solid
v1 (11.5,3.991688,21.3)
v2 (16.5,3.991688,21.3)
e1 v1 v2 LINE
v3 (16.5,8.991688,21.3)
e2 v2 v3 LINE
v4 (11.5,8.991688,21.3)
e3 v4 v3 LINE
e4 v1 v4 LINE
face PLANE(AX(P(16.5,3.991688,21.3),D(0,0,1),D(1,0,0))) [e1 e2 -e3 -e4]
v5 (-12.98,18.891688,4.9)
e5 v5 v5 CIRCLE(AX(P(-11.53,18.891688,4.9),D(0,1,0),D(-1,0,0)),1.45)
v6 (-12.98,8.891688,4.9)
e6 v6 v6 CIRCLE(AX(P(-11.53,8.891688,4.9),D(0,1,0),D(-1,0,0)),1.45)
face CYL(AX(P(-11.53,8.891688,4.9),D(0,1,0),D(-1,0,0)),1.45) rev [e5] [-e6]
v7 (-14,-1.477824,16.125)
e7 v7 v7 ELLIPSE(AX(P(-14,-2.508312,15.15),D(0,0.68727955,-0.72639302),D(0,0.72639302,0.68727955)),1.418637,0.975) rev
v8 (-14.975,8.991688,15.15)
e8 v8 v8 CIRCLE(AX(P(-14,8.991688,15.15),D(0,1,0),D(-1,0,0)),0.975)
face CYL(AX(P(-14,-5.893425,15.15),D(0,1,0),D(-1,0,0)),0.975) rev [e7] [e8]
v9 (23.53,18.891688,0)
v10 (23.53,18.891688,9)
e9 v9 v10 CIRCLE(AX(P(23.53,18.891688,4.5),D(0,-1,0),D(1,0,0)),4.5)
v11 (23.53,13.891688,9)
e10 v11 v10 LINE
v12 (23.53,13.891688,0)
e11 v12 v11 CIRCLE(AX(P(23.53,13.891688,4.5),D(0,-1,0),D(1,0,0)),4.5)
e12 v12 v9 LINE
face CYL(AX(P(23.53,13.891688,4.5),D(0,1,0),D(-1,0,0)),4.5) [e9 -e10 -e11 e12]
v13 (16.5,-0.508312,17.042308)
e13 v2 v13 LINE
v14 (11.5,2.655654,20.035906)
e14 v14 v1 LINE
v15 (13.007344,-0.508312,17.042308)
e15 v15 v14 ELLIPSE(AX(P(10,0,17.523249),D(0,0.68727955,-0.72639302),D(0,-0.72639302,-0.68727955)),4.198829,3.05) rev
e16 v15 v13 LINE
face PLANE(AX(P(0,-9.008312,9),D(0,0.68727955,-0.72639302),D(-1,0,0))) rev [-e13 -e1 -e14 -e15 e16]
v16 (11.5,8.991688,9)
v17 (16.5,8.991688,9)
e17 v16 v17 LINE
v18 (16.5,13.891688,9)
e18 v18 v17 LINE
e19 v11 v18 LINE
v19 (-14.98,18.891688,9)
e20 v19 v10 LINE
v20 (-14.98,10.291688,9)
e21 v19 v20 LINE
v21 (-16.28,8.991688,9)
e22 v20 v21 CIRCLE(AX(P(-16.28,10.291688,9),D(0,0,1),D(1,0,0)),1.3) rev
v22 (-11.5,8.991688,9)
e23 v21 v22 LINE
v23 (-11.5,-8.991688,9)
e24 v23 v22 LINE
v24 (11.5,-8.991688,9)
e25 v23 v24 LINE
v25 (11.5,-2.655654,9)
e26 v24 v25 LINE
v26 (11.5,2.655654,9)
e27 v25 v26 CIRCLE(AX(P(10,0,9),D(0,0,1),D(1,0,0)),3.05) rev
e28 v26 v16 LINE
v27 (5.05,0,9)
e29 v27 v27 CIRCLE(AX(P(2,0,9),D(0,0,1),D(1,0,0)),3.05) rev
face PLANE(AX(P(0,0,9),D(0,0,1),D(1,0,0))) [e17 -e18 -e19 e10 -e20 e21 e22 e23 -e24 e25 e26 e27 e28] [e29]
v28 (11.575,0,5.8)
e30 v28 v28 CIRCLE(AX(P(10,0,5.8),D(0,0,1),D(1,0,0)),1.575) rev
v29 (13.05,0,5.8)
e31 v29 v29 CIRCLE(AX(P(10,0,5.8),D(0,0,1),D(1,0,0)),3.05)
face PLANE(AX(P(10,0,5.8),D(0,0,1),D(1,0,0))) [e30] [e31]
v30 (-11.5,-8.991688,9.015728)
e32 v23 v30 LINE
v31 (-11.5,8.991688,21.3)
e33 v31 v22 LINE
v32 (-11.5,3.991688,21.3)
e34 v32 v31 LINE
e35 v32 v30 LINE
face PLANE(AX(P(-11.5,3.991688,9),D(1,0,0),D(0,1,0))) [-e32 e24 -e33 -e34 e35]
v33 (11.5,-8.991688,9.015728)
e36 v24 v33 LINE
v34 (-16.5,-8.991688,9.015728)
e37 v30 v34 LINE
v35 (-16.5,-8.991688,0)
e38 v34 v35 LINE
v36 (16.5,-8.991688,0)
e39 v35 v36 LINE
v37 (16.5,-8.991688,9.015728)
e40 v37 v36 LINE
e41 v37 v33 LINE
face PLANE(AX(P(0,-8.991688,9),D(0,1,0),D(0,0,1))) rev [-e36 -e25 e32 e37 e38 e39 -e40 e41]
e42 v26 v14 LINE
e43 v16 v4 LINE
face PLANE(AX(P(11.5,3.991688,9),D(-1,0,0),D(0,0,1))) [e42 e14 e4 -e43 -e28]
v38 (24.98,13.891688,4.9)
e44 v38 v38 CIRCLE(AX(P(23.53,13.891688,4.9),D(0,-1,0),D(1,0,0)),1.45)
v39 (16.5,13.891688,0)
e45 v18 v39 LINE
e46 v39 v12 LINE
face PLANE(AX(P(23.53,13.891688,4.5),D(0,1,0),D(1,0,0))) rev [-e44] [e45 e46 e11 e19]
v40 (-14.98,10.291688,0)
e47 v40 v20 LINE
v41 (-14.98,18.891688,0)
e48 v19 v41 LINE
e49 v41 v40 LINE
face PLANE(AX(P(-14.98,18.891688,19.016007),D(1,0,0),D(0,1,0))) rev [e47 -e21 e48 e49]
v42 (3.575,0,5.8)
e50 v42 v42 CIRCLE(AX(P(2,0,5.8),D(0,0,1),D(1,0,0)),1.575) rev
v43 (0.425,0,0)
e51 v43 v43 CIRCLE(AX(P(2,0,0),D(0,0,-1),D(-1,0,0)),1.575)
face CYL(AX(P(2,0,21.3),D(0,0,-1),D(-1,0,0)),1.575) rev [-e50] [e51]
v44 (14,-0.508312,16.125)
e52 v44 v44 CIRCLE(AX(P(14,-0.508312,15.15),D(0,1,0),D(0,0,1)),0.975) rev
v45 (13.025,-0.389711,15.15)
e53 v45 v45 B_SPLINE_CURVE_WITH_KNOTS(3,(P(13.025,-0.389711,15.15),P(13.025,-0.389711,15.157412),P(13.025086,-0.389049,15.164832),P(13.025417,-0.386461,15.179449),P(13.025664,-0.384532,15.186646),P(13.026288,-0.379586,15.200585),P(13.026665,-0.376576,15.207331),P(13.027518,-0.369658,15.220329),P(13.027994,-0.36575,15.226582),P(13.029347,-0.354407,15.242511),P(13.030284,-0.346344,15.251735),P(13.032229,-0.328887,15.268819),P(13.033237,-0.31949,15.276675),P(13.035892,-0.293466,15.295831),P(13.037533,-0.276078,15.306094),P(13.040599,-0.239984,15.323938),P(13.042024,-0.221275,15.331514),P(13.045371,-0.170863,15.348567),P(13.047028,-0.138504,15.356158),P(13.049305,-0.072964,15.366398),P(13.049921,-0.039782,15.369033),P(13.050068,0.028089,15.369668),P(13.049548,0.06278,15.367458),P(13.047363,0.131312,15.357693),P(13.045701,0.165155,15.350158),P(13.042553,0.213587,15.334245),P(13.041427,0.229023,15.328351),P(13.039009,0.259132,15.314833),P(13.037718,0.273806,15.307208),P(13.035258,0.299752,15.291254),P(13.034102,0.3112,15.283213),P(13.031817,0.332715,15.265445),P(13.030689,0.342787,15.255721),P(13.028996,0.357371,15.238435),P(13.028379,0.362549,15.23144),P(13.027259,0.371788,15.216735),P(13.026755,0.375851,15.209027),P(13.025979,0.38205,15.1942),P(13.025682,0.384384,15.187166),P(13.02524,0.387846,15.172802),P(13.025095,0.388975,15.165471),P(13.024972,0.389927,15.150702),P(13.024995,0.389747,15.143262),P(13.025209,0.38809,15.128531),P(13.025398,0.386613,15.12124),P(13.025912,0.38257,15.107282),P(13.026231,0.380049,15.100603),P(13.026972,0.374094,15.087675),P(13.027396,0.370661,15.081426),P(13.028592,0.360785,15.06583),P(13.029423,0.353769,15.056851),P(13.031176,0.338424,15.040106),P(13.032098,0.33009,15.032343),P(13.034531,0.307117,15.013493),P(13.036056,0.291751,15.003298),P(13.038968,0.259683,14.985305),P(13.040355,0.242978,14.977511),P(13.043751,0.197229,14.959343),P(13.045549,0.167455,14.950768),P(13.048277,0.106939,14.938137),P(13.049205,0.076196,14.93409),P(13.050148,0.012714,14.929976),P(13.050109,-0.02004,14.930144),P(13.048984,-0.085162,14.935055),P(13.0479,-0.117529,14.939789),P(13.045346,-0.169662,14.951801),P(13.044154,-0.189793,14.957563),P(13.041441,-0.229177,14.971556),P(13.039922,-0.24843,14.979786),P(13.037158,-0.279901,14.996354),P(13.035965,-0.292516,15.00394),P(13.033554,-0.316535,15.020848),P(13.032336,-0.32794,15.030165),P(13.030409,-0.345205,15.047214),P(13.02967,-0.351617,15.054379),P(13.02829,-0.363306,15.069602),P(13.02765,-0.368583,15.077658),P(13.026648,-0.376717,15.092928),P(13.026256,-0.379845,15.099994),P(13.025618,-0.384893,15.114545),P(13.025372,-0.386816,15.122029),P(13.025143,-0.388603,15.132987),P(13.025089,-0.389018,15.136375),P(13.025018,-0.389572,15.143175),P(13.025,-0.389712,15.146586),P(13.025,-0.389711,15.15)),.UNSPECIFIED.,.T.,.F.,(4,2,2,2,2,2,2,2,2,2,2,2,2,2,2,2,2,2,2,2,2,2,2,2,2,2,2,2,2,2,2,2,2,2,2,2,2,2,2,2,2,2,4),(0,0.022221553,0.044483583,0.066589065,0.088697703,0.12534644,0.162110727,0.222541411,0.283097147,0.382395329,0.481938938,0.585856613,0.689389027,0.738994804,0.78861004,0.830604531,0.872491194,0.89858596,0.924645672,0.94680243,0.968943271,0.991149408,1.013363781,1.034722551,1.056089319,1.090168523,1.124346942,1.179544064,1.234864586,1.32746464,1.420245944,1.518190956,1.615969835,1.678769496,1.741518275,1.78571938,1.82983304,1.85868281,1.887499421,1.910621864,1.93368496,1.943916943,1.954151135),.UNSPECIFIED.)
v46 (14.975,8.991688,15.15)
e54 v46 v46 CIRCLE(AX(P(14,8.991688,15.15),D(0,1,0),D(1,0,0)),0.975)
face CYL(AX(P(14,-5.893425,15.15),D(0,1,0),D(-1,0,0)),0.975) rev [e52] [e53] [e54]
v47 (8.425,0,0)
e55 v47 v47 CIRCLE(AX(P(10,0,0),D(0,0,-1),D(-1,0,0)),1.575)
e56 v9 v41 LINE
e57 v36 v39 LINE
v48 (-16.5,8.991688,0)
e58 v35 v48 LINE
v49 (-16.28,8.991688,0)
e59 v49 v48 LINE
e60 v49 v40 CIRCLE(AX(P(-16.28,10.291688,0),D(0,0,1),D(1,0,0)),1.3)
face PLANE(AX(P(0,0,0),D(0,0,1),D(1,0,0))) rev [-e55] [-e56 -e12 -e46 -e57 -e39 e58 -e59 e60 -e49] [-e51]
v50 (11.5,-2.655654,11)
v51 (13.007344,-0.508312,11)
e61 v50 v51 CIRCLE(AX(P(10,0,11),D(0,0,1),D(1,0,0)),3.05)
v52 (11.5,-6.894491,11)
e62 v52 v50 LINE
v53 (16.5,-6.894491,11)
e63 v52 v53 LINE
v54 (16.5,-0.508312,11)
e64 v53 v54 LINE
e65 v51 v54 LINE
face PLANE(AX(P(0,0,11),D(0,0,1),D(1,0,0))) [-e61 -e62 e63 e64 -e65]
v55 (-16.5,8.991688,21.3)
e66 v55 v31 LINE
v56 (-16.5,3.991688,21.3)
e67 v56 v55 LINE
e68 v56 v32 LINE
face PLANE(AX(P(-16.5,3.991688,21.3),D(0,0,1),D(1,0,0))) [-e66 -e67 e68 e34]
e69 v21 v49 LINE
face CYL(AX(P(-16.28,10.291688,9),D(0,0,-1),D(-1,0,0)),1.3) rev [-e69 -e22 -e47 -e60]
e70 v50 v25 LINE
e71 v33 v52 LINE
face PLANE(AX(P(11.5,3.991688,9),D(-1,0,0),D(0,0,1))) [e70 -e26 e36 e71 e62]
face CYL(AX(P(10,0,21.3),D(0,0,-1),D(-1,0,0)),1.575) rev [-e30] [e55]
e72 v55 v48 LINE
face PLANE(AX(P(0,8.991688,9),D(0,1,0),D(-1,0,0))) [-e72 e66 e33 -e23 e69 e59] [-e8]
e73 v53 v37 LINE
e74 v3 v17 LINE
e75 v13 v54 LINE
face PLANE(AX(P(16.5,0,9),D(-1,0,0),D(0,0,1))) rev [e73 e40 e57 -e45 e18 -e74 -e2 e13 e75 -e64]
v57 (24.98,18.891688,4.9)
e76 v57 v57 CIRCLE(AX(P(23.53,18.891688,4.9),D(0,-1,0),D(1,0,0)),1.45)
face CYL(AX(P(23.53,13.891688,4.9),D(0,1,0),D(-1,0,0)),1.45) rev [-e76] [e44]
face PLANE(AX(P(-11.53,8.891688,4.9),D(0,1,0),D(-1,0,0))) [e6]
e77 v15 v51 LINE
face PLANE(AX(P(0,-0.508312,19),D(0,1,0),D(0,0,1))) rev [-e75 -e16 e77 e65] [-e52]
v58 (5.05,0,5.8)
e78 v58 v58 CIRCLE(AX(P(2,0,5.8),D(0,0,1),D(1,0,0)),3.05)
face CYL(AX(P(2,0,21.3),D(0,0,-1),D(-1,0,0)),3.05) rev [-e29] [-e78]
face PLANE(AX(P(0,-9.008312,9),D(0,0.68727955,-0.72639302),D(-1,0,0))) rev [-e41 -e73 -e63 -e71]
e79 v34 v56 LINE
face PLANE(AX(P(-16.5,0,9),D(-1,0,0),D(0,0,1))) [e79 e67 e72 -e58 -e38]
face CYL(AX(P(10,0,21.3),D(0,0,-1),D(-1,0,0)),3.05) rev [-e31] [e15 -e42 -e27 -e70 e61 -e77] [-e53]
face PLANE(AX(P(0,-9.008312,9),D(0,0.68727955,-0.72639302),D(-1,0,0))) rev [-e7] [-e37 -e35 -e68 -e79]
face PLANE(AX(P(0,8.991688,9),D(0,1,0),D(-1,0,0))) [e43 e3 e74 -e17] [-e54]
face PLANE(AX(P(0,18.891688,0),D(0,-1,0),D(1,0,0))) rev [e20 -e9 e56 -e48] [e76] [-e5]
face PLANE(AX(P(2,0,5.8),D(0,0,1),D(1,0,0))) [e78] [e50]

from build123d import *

# Parameters (mm, degrees)
SKETCH1_W               = 33
SKETCH1_H               = 17.983376384
BOSS_EXTRUDE1_DEPTH     = 9
SKETCH4_W               = 5
SKETCH4_H               = 12.3
BOSS_EXTRUDE2_DEPTH     = 5
CHAMFER1_SIZE           = 13
CHAMFER1_SIZE_2         = 12.3
SKETCH2_R               = 1.575
CUT_EXTRUDE1_DEPTH      = 29.404057044
CUT_EXTRUDE2_DEPTH      = 23.458638795
CUT_EXTRUDE2_DEPTH_BACK = 3.2
SKETCH3_R               = 3.05
CUT_EXTRUDE3_REACH      = 34.394
SKETCH5_R               = 0.975
SKETCH6_W               = 33
SKETCH6_H               = 9
BOSS_EXTRUDE3_DEPTH     = 9.9
CUT_EXTRUDE4_START      = 2
CUT_EXTRUDE4_DEPTH      = 8
SKETCH8_R               = 1.45
CUT_EXTRUDE5_DEPTH      = 10
SKETCH9_R               = 1.45
BOSS_EXTRUDE4_DEPTH     = 5
SKETCH10_W              = 1.52
SKETCH10_H              = 9.9
CUT_EXTRUDE6_DEPTH      = 9
FILLET1_R               = 1.3


with BuildPart() as part:
    # Sketch1 → Boss-Extrude1 (new body)
    with BuildSketch(Plane.XY):
        Rectangle(SKETCH1_W, SKETCH1_H)
    extrude(amount=BOSS_EXTRUDE1_DEPTH)

    # Sketch4 → Boss-Extrude2 (add)
    with BuildSketch(Plane(origin=(0, 8.991688192, 0), x_dir=(1, 0, 0), z_dir=(0, 1, 0))):
        with Locations((-14, -15.15)):
            Rectangle(SKETCH4_W, SKETCH4_H)
        with Locations((14, -15.15)):
            Rectangle(SKETCH4_W, SKETCH4_H)
    extrude(amount=-BOSS_EXTRUDE2_DEPTH)

    # Chamfer1
    # the kernel refuses this chamfer: 13, 12.3 mm, written as the material it adds along each edge
    with BuildSketch(Plane(origin=(-16.5, 3.991688192, 9), x_dir=(0, -0.9996433463604261, -0.02670543160724426), z_dir=(1, 0, 0))) as chamfer1_piece_1_section:
        Polygon((CHAMFER1_SIZE * 0.99964334636, -CHAMFER1_SIZE * 0.0267054316072), (-CHAMFER1_SIZE_2 * 0.0267054316072, -CHAMFER1_SIZE_2 * 0.99964334636), (0, 0), align=None)
    chamfer1_piece_1 = extrude(amount=5, mode=Mode.PRIVATE)
    chamfer1_piece_1 = split(chamfer1_piece_1, bisect_by=Plane(origin=(-14, -8.991688192, 13.04185716), z_dir=(0, 1, 0)), keep=Keep.TOP, mode=Mode.PRIVATE)
    chamfer1_piece_1 = split(chamfer1_piece_1, bisect_by=Plane(origin=(-14, -0.292838715, 21.3), z_dir=(0, 0, -1)), keep=Keep.TOP, mode=Mode.PRIVATE)
    add(chamfer1_piece_1)
    with BuildSketch(Plane(origin=(-16.5, 3.991688192, 9), x_dir=(0, -0.9996433463604261, -0.02670543160724426), z_dir=(1, 0, 0))) as chamfer1_piece_2_section:
        Polygon((CHAMFER1_SIZE * 0.99964334636, -CHAMFER1_SIZE * 0.0267054316072), (-CHAMFER1_SIZE_2 * 0.0267054316072, -CHAMFER1_SIZE_2 * 0.99964334636), (0, 0), align=None)
    chamfer1_piece_2 = extrude(amount=38.456243217, mode=Mode.PRIVATE)
    chamfer1_piece_2 = split(chamfer1_piece_2, bisect_by=Plane(origin=(14, -8.991688192, 13.04185716), z_dir=(0, 1, 0)), keep=Keep.TOP, mode=Mode.PRIVATE)
    chamfer1_piece_2 = split(chamfer1_piece_2, bisect_by=Plane(origin=(16.5, -0.292838715, 13.04185716), z_dir=(-1, 0, 0)), keep=Keep.TOP, mode=Mode.PRIVATE)
    chamfer1_piece_2 = split(chamfer1_piece_2, bisect_by=Plane(origin=(11.5, -0.292838715, 13.04185716), z_dir=(1, 0, 0)), keep=Keep.TOP, mode=Mode.PRIVATE)
    chamfer1_piece_2 = split(chamfer1_piece_2, bisect_by=Plane(origin=(14, -0.292838715, 21.3), z_dir=(0, 0, -1)), keep=Keep.TOP, mode=Mode.PRIVATE)
    add(chamfer1_piece_2)
    with BuildSketch(Plane(origin=(16.5, 3.991688192, 9), x_dir=(0, -0.9996433463604261, -0.02670543160724426), z_dir=(-1, 0, 0))) as chamfer1_piece_3_section:
        Polygon((CHAMFER1_SIZE * 0.99964334636, CHAMFER1_SIZE * 0.0267054316072), (-CHAMFER1_SIZE_2 * 0.0267054316072, CHAMFER1_SIZE_2 * 0.99964334636), (0, 0), align=None)
    chamfer1_piece_3 = extrude(amount=5, mode=Mode.PRIVATE)
    chamfer1_piece_3 = split(chamfer1_piece_3, bisect_by=Plane(origin=(14, -8.991688192, 13.04185716), z_dir=(0, 1, 0)), keep=Keep.TOP, mode=Mode.PRIVATE)
    chamfer1_piece_3 = split(chamfer1_piece_3, bisect_by=Plane(origin=(14, -0.292838715, 21.3), z_dir=(0, 0, -1)), keep=Keep.TOP, mode=Mode.PRIVATE)
    add(chamfer1_piece_3)
    with BuildSketch(Plane(origin=(16.5, 3.991688192, 9), x_dir=(0, -0.9996433463604261, -0.02670543160724426), z_dir=(-1, 0, 0))) as chamfer1_piece_4_section:
        Polygon((CHAMFER1_SIZE * 0.99964334636, CHAMFER1_SIZE * 0.0267054316072), (-CHAMFER1_SIZE_2 * 0.0267054316072, CHAMFER1_SIZE_2 * 0.99964334636), (0, 0), align=None)
    chamfer1_piece_4 = extrude(amount=38.456243217, mode=Mode.PRIVATE)
    chamfer1_piece_4 = split(chamfer1_piece_4, bisect_by=Plane(origin=(-14, -8.991688192, 13.04185716), z_dir=(0, 1, 0)), keep=Keep.TOP, mode=Mode.PRIVATE)
    chamfer1_piece_4 = split(chamfer1_piece_4, bisect_by=Plane(origin=(-16.5, -0.292838715, 13.04185716), z_dir=(1, 0, 0)), keep=Keep.TOP, mode=Mode.PRIVATE)
    chamfer1_piece_4 = split(chamfer1_piece_4, bisect_by=Plane(origin=(-14, -0.292838715, 21.3), z_dir=(0, 0, -1)), keep=Keep.TOP, mode=Mode.PRIVATE)
    chamfer1_piece_4 = split(chamfer1_piece_4, bisect_by=Plane(origin=(-11.5, -0.292838715, 13.04185716), z_dir=(-1, 0, 0)), keep=Keep.TOP, mode=Mode.PRIVATE)
    add(chamfer1_piece_4)

    # Sketch2 → Cut-Extrude1 (cut, through all)
    with BuildSketch(Plane(origin=(0, 0, 0), x_dir=(-1, 0, 0), z_dir=(0, 0, -1))):
        with Locations((-2, 0)):
            Circle(SKETCH2_R)
        with Locations((-10, 0)):
            Circle(SKETCH2_R)
    extrude(amount=-CUT_EXTRUDE1_DEPTH, mode=Mode.SUBTRACT)

    # Sketch3 → Cut-Extrude2 (cut, two sides: drawn at the far end of the back side and taken through both)
    with BuildSketch(Plane.XY.offset(9).offset(-CUT_EXTRUDE2_DEPTH_BACK)):
        with Locations((2, 0)):
            Circle(SKETCH3_R)
        with Locations(Location((10, 0, 0), (0, 0, 60.540825088))):
            Circle(SKETCH3_R)
    extrude(amount=CUT_EXTRUDE2_DEPTH + CUT_EXTRUDE2_DEPTH_BACK, mode=Mode.SUBTRACT)

    # Cut-Extrude3: up to this plane
    cut_extrude3_end = Plane(origin=(0, -9.008311808, 9), z_dir=(0, 0.6872795500600087, -0.726393020388627))
    # Sketch5 → Cut-Extrude3 (cut, up to the surface)
    with BuildSketch(Plane(origin=(0, 8.991688192, 0), x_dir=(1, 0, 0), z_dir=(0, 1, 0)), mode=Mode.PRIVATE) as cut_extrude3_sk1:
        with Locations(Location((-14, -15.15, 0), (0, 0, 180))):
            Circle(SKETCH5_R)
    cut_extrude3_tool1 = split(extrude(cut_extrude3_sk1.sketch, amount=-CUT_EXTRUDE3_REACH, mode=Mode.PRIVATE), bisect_by=cut_extrude3_end, keep=Keep.BOTH, mode=Mode.PRIVATE)
    add(cut_extrude3_tool1.solids().sort_by_distance((-14, 8.991688, 15.15))[0], mode=Mode.SUBTRACT)
    # Sketch5 → Cut-Extrude3 (cut, up to the surface)
    with BuildSketch(Plane(origin=(0, 8.991688192, 0), x_dir=(1, 0, 0), z_dir=(0, 1, 0)), mode=Mode.PRIVATE) as cut_extrude3_sk2:
        with Locations(Location((14, -15.15, 0), (0, 0, 270))):
            Circle(SKETCH5_R)
    cut_extrude3_tool2 = split(extrude(cut_extrude3_sk2.sketch, amount=-CUT_EXTRUDE3_REACH, mode=Mode.PRIVATE), bisect_by=cut_extrude3_end, keep=Keep.BOTH, mode=Mode.PRIVATE)
    add(cut_extrude3_tool2.solids().sort_by_distance((14, 8.991688, 15.15))[0], mode=Mode.SUBTRACT)

    # Sketch6 → Boss-Extrude3 (add)
    with BuildSketch(Plane(origin=(0, 8.991688192, 0), x_dir=(1, 0, 0), z_dir=(0, 1, 0))):
        with Locations((0, -4.5)):
            Rectangle(SKETCH6_W, SKETCH6_H)
    extrude(amount=BOSS_EXTRUDE3_DEPTH)

    # Sketch7 → Cut-Extrude4 (cut)
    with BuildSketch(Plane.XY.offset(9).offset(CUT_EXTRUDE4_START)):
        Polygon((11.5, -2.655654345), (11.5, -5.508311808), (16.5, -5.508311808), (16.5, -0.508311808), (11.5, -0.508311808), align=None)
        Polygon((16.5, -5.508311808), (11.5, -5.508311808), (11.5, -8.991688192), (11.5, -10.104288395), (16.5, -10.104288395), align=None)
    extrude(amount=CUT_EXTRUDE4_DEPTH, mode=Mode.SUBTRACT)

    # Sketch8 → Cut-Extrude5 (cut)
    with BuildSketch(Plane(origin=(0, 18.891688192, 0), x_dir=(1, 0, 0), z_dir=(0, 1, 0))):
        with Locations(Location((-11.53, -4.9, 0), (0, 0, 180))):
            Circle(SKETCH8_R)
    cut_extrude5 = extrude(amount=-CUT_EXTRUDE5_DEPTH, mode=Mode.SUBTRACT)

    # Sketch9 → Boss-Extrude4 (add)
    with BuildSketch(Plane(origin=(0, 18.891688192, 0), x_dir=(1, 0, 0), z_dir=(0, 1, 0))):
        with BuildLine():
            Line((-11.53, 0), (-1.44116457, 0))
            ThreePointArc((-1.44116457, 0), (3.05883543, -4.5), (-1.44116457, -9))
            Line((-1.44116457, -9), (-11.53, -9))
            ThreePointArc((-11.53, -9), (-16.03, -4.5), (-11.53, 0))
        make_face()
        with Locations(Location((-11.53, -4.9, 0), (0, 0, 180))):
            Circle(SKETCH9_R, mode=Mode.SUBTRACT)
    boss_extrude4 = extrude(amount=-BOSS_EXTRUDE4_DEPTH)

    # Mirror1: Cut-Extrude5, Boss-Extrude4 across plane
    add(cut_extrude5.mirror(Plane(origin=(6, 0, 0), x_dir=(0, 0, 1), z_dir=(1, 0, 0))), mode=Mode.SUBTRACT)
    add(boss_extrude4.mirror(Plane(origin=(6, 0, 0), x_dir=(0, 0, 1), z_dir=(1, 0, 0))))

    # Sketch10 → Cut-Extrude6 (cut)
    with BuildSketch(Plane(origin=(0, 0, 0), x_dir=(-1, 0, 0), z_dir=(0, 0, -1))):
        with Locations((15.74, 13.941688192)):
            Rectangle(SKETCH10_W, SKETCH10_H)
    extrude(amount=-CUT_EXTRUDE6_DEPTH, mode=Mode.SUBTRACT)

    # Fillet1
    fillet1_edges = [part.edges().sort_by_distance(p)[0] for p in [
        (-14.98, 8.991688192, 4.5),
    ]]
    fillet(fillet1_edges, radius=FILLET1_R)


solid = part.part
